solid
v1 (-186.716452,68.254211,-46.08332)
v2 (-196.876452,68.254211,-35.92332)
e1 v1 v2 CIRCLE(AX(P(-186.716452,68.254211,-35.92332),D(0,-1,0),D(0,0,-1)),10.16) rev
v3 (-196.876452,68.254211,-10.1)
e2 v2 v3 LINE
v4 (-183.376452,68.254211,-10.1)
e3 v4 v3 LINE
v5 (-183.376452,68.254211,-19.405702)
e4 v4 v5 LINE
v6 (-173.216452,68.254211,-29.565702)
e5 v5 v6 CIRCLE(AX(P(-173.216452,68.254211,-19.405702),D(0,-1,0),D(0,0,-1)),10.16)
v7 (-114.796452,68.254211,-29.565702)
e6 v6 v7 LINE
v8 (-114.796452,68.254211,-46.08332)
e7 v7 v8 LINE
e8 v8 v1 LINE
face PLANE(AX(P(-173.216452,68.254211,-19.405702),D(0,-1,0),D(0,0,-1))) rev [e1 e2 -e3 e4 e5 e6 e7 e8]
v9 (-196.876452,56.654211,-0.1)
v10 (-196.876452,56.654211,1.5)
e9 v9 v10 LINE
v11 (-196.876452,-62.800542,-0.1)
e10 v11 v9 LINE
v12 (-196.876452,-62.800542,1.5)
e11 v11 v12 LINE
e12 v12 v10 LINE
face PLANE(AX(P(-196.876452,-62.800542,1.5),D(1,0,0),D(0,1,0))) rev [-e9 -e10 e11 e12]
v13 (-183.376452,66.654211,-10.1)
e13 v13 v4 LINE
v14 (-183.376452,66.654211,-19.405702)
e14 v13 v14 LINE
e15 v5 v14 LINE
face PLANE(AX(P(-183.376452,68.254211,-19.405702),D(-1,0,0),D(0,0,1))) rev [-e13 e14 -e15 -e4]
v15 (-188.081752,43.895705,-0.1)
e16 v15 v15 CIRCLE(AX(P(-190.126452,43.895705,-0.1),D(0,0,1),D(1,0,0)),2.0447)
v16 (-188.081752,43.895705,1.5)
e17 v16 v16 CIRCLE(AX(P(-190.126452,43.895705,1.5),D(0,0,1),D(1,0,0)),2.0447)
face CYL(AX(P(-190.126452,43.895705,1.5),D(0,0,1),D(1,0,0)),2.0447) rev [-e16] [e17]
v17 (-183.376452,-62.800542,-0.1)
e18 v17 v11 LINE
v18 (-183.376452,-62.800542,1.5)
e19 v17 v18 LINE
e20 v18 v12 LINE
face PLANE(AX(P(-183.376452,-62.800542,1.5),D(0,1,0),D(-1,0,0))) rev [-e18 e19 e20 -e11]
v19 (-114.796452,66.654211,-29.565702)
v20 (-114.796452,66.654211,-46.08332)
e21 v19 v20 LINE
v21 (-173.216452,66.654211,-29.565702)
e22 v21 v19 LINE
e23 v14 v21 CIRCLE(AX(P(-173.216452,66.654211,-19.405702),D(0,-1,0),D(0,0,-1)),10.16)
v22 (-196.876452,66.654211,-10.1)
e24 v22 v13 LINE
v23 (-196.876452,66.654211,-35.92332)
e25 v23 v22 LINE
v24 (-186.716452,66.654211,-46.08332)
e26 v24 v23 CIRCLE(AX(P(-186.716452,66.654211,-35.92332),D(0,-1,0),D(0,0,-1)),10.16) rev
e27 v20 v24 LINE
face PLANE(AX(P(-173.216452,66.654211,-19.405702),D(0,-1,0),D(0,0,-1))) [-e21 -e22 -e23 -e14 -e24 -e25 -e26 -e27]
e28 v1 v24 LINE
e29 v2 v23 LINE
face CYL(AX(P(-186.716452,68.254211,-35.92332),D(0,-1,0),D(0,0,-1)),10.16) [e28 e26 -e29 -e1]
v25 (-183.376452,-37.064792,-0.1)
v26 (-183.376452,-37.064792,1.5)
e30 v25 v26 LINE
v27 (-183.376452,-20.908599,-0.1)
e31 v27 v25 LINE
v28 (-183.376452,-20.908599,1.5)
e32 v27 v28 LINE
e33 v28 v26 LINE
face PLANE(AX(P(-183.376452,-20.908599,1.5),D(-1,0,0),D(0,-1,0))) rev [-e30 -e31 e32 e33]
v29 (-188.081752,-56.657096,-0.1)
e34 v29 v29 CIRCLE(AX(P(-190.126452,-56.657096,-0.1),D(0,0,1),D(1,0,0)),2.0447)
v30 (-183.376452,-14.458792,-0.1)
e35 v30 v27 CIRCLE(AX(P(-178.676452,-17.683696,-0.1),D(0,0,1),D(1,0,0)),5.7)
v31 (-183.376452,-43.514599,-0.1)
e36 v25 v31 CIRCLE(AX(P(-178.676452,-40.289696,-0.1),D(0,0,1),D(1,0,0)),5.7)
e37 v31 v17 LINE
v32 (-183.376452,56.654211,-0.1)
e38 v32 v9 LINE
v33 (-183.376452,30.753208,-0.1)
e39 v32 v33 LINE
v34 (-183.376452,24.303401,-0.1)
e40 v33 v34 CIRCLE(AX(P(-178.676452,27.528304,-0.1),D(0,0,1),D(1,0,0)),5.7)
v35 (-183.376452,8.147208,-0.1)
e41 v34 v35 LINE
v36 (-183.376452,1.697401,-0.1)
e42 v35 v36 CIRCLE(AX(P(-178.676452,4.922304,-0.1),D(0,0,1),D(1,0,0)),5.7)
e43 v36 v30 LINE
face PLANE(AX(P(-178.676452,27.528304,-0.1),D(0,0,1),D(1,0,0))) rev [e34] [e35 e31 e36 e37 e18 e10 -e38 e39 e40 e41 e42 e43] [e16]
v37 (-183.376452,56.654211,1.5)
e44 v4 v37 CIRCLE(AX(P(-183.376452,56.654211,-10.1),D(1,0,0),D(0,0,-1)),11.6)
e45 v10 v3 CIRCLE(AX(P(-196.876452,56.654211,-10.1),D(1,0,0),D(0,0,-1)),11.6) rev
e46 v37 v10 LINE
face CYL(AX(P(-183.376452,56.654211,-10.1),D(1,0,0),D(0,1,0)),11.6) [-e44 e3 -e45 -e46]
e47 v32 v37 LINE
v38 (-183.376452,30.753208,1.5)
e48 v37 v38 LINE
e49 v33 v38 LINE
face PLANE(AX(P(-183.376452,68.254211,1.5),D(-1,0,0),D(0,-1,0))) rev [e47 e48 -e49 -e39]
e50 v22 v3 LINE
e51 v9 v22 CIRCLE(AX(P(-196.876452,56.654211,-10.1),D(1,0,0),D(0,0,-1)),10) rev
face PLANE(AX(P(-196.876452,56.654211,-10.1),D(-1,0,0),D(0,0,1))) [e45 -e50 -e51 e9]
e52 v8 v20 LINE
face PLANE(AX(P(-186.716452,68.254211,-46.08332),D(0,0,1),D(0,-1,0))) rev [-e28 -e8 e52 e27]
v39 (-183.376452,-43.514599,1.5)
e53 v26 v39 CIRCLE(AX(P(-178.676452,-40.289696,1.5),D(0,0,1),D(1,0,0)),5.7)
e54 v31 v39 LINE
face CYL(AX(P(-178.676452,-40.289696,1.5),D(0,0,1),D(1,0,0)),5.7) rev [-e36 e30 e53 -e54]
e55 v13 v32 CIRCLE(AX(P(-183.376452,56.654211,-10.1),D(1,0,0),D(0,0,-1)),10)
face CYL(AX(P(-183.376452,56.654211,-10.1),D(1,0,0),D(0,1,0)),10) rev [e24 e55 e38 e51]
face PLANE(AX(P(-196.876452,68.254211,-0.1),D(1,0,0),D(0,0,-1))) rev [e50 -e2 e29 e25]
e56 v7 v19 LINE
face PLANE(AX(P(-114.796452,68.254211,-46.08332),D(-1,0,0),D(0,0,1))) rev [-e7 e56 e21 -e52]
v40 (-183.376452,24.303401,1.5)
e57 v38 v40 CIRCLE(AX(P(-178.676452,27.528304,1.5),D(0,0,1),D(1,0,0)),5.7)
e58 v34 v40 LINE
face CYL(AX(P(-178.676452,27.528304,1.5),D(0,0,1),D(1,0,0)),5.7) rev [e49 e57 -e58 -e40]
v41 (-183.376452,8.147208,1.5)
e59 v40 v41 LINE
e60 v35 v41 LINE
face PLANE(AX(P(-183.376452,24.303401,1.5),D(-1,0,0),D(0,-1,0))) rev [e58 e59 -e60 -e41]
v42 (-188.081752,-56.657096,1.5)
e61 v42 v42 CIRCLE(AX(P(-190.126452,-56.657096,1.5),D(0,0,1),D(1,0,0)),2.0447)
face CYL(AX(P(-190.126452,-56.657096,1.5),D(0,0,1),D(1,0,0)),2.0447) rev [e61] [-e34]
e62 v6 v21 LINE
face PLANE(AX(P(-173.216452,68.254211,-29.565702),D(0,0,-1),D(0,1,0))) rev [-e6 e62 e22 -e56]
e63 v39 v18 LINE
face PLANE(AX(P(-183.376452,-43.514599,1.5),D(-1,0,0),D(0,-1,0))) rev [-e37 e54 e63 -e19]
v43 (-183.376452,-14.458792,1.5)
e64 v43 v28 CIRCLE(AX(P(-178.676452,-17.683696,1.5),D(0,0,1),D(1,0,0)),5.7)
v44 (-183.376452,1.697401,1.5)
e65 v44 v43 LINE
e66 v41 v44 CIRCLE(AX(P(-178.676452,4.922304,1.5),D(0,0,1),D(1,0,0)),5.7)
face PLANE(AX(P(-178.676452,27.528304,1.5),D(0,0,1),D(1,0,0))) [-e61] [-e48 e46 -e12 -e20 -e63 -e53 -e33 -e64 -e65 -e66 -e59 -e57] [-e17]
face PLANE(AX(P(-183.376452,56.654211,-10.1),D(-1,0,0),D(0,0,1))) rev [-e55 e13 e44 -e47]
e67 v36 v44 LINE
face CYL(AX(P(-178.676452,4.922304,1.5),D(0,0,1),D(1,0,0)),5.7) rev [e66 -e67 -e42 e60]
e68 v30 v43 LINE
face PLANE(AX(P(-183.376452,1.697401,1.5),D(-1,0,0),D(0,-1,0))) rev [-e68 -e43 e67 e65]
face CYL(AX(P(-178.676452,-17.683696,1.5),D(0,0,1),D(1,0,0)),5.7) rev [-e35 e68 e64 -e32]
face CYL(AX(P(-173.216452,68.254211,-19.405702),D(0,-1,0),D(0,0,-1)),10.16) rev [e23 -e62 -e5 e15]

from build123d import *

# Parameters (mm, degrees)
SKETCH1_R                    = 2.0447
BOSS_EXTRUDE1_DEPTH          = 1.5
CONVERT_SOLID1_START         = -0.100000102
CONVERT_SOLID1_OUTLINE_R     = 2.0447
CONVERT_SOLID1_DEPTH         = 0.100000102
EDGE_FLANGE1_STRIP_W         = 26.400000408
EDGE_FLANGE1_STRIP_H         = 1.600000102
EDGE_FLANGE1_STRIP_CUT_DEPTH = 13.5
EDGE_FLANGE1_DEPTH           = 13.5
EDGE_FLANGE1_FLAT_DEPTH      = 1.600000102
CUT_EXTRUDE1_DEPTH           = 241.95509557
CUT_EXTRUDE1_DEPTH_BACK      = 3.81
SKETCH14_R                   = 6.583720687


# Read off the part's stored shape, not the designer's step: Convert-Solid1
# Sheet-metal steps are written as plain solids
with BuildPart() as part:
    # Sketch1 → Boss-Extrude1 (new body)
    with BuildSketch(Plane.XY):
        with BuildLine():
            Line((-183.376451986, -43.514598677), (-183.376451986, -62.800541688))
            Line((-183.376451986, -62.800541688), (-196.876451986, -62.800541688))
            Line((-196.876451986, -62.800541688), (-196.876451986, 68.254211442))
            Line((-196.876451986, 68.254211442), (-183.376451986, 68.254211442))
            Line((-183.376451986, 68.254211442), (-183.376451986, 47.120607659))
            Line((-183.376451986, 47.120607659), (-183.376451986, 40.670801349))
            Line((-183.376451986, 40.670801349), (-183.376451986, 30.753207577))
            ThreePointArc((-183.376451986, 30.753207577), (-184.376452018, 27.528304422), (-183.376451986, 24.303401267))
            Line((-183.376451986, 24.303401267), (-183.376451986, 8.147207521))
            ThreePointArc((-183.376451986, 8.147207521), (-184.376451986, 4.922304422), (-183.376451986, 1.697401323))
            Line((-183.376451986, 1.697401323), (-183.376451986, -14.458792479))
            ThreePointArc((-183.376451986, -14.458792479), (-184.376451986, -17.683695578), (-183.376451986, -20.908598677))
            Line((-183.376451986, -20.908598677), (-183.376451986, -37.064792479))
            ThreePointArc((-183.376451986, -37.064792479), (-184.376451986, -40.289695578), (-183.376451986, -43.514598677))
        make_face()
        with Locations((-190.126451986, -56.65709566)):
            Circle(SKETCH1_R, mode=Mode.SUBTRACT)
        with Locations((-190.126451986, 43.895704504)):
            Circle(SKETCH1_R, mode=Mode.SUBTRACT)
    extrude(amount=BOSS_EXTRUDE1_DEPTH)

    # Convert-Solid1 outline → Convert-Solid1 (add)
    with BuildSketch(Plane.XY.offset(CONVERT_SOLID1_START)):
        with BuildLine():
            Line((-183.376451986, -62.800541688), (-183.376451986, -43.514598677))
            ThreePointArc((-183.376451986, -43.514598677), (-184.376451986, -40.289695578), (-183.376451986, -37.064792479))
            Line((-183.376451986, -37.064792479), (-183.376451986, -20.908598677))
            ThreePointArc((-183.376451986, -20.908598677), (-184.376451986, -17.683695578), (-183.376451986, -14.458792479))
            Line((-183.376451986, -14.458792479), (-183.376451986, 1.697401323))
            ThreePointArc((-183.376451986, 1.697401323), (-184.376451986, 4.922304422), (-183.376451986, 8.147207521))
            Line((-183.376451986, 8.147207521), (-183.376451986, 24.303401267))
            ThreePointArc((-183.376451986, 24.303401267), (-184.376452018, 27.528304422), (-183.376451986, 30.753207577))
            Line((-183.376451986, 30.753207577), (-183.376451986, 68.254211442))
            Line((-183.376451986, 68.254211442), (-196.876451986, 68.254211442))
            Line((-196.876451986, 68.254211442), (-196.876451986, -62.800541688))
            Line((-196.876451986, -62.800541688), (-183.376451986, -62.800541688))
        make_face()
        with Locations((-190.126451986, -56.65709566)):
            Circle(CONVERT_SOLID1_OUTLINE_R, mode=Mode.SUBTRACT)
        with Locations((-190.126451986, 43.895704504)):
            Circle(CONVERT_SOLID1_OUTLINE_R, mode=Mode.SUBTRACT)
    extrude(amount=CONVERT_SOLID1_DEPTH)

    # Edge-Flange1 strip (across the edge) → Edge-Flange1 strip cut (cut)
    with BuildSketch(Plane(origin=(-196.876451986, 68.254211442, -0.100000102), x_dir=(0, -1, 0), z_dir=(1, 0, 0))):
        with Locations((-1.600000102, -0.800000051)):
            Rectangle(EDGE_FLANGE1_STRIP_W, EDGE_FLANGE1_STRIP_H)
    extrude(amount=EDGE_FLANGE1_STRIP_CUT_DEPTH, mode=Mode.SUBTRACT)

    # Edge-Flange1 bend section (across the edge) → Edge-Flange1 (add)
    with BuildSketch(Plane(origin=(-196.876451986, 68.254211442, -0.100000102), x_dir=(0, -1, 0), z_dir=(1, 0, 0))):
        with BuildLine():
            Line((0, 10), (1.600000102, 10))
            ThreePointArc((1.600000102, 10), (4.52893229, 2.928932188), (11.600000102, 0))
            Line((11.600000102, 0), (11.600000102, -1.600000102))
            ThreePointArc((11.600000102, -1.600000102), (3.397561368, 1.797561266), (0, 10))
        make_face()
    extrude(amount=EDGE_FLANGE1_DEPTH)

    # Edge-Flange1 profile (on flange) → Edge-Flange1 flat (add)
    with BuildSketch(Plane(origin=(0, 68.254211442, -0.100000102), x_dir=(1, 0, 0), z_dir=(0, 1, 0))):
        with BuildLine():
            Line((-196.876451986, 10), (-183.376451986, 10))
            Line((-183.376451986, 10), (-183.376451986, 19.305702381))
            ThreePointArc((-183.376451986, 19.305702381), (-180.400656883, 26.489907277), (-173.216451986, 29.465702381))
            Line((-173.216451986, 29.465702381), (-114.796451986, 29.465702381))
            Line((-114.796451986, 29.465702381), (-114.796451986, 45.983320267))
            Line((-114.796451986, 45.983320267), (-175.756451986, 45.983320267))
            Line((-175.756451986, 45.983320267), (-186.716451986, 45.983320267))
            ThreePointArc((-186.716451986, 45.983320267), (-193.900656883, 43.007525164), (-196.876451986, 35.823320267))
            Line((-196.876451986, 35.823320267), (-196.876451986, 10))
        make_face()
    extrude(amount=-EDGE_FLANGE1_FLAT_DEPTH)

    # Sketch14 → Cut-Extrude1 (cut, two sides: drawn at the far end of the back side and taken through both)
    with BuildSketch(Plane(origin=(0, 68.254211442, 0), x_dir=(1, 0, 0), z_dir=(0, 1, 0)).offset(-CUT_EXTRUDE1_DEPTH_BACK)):
        with Locations((-99.147079888, 65.798432199)):
            Circle(SKETCH14_R)
    extrude(amount=CUT_EXTRUDE1_DEPTH + CUT_EXTRUDE1_DEPTH_BACK, mode=Mode.SUBTRACT)


solid = part.part
